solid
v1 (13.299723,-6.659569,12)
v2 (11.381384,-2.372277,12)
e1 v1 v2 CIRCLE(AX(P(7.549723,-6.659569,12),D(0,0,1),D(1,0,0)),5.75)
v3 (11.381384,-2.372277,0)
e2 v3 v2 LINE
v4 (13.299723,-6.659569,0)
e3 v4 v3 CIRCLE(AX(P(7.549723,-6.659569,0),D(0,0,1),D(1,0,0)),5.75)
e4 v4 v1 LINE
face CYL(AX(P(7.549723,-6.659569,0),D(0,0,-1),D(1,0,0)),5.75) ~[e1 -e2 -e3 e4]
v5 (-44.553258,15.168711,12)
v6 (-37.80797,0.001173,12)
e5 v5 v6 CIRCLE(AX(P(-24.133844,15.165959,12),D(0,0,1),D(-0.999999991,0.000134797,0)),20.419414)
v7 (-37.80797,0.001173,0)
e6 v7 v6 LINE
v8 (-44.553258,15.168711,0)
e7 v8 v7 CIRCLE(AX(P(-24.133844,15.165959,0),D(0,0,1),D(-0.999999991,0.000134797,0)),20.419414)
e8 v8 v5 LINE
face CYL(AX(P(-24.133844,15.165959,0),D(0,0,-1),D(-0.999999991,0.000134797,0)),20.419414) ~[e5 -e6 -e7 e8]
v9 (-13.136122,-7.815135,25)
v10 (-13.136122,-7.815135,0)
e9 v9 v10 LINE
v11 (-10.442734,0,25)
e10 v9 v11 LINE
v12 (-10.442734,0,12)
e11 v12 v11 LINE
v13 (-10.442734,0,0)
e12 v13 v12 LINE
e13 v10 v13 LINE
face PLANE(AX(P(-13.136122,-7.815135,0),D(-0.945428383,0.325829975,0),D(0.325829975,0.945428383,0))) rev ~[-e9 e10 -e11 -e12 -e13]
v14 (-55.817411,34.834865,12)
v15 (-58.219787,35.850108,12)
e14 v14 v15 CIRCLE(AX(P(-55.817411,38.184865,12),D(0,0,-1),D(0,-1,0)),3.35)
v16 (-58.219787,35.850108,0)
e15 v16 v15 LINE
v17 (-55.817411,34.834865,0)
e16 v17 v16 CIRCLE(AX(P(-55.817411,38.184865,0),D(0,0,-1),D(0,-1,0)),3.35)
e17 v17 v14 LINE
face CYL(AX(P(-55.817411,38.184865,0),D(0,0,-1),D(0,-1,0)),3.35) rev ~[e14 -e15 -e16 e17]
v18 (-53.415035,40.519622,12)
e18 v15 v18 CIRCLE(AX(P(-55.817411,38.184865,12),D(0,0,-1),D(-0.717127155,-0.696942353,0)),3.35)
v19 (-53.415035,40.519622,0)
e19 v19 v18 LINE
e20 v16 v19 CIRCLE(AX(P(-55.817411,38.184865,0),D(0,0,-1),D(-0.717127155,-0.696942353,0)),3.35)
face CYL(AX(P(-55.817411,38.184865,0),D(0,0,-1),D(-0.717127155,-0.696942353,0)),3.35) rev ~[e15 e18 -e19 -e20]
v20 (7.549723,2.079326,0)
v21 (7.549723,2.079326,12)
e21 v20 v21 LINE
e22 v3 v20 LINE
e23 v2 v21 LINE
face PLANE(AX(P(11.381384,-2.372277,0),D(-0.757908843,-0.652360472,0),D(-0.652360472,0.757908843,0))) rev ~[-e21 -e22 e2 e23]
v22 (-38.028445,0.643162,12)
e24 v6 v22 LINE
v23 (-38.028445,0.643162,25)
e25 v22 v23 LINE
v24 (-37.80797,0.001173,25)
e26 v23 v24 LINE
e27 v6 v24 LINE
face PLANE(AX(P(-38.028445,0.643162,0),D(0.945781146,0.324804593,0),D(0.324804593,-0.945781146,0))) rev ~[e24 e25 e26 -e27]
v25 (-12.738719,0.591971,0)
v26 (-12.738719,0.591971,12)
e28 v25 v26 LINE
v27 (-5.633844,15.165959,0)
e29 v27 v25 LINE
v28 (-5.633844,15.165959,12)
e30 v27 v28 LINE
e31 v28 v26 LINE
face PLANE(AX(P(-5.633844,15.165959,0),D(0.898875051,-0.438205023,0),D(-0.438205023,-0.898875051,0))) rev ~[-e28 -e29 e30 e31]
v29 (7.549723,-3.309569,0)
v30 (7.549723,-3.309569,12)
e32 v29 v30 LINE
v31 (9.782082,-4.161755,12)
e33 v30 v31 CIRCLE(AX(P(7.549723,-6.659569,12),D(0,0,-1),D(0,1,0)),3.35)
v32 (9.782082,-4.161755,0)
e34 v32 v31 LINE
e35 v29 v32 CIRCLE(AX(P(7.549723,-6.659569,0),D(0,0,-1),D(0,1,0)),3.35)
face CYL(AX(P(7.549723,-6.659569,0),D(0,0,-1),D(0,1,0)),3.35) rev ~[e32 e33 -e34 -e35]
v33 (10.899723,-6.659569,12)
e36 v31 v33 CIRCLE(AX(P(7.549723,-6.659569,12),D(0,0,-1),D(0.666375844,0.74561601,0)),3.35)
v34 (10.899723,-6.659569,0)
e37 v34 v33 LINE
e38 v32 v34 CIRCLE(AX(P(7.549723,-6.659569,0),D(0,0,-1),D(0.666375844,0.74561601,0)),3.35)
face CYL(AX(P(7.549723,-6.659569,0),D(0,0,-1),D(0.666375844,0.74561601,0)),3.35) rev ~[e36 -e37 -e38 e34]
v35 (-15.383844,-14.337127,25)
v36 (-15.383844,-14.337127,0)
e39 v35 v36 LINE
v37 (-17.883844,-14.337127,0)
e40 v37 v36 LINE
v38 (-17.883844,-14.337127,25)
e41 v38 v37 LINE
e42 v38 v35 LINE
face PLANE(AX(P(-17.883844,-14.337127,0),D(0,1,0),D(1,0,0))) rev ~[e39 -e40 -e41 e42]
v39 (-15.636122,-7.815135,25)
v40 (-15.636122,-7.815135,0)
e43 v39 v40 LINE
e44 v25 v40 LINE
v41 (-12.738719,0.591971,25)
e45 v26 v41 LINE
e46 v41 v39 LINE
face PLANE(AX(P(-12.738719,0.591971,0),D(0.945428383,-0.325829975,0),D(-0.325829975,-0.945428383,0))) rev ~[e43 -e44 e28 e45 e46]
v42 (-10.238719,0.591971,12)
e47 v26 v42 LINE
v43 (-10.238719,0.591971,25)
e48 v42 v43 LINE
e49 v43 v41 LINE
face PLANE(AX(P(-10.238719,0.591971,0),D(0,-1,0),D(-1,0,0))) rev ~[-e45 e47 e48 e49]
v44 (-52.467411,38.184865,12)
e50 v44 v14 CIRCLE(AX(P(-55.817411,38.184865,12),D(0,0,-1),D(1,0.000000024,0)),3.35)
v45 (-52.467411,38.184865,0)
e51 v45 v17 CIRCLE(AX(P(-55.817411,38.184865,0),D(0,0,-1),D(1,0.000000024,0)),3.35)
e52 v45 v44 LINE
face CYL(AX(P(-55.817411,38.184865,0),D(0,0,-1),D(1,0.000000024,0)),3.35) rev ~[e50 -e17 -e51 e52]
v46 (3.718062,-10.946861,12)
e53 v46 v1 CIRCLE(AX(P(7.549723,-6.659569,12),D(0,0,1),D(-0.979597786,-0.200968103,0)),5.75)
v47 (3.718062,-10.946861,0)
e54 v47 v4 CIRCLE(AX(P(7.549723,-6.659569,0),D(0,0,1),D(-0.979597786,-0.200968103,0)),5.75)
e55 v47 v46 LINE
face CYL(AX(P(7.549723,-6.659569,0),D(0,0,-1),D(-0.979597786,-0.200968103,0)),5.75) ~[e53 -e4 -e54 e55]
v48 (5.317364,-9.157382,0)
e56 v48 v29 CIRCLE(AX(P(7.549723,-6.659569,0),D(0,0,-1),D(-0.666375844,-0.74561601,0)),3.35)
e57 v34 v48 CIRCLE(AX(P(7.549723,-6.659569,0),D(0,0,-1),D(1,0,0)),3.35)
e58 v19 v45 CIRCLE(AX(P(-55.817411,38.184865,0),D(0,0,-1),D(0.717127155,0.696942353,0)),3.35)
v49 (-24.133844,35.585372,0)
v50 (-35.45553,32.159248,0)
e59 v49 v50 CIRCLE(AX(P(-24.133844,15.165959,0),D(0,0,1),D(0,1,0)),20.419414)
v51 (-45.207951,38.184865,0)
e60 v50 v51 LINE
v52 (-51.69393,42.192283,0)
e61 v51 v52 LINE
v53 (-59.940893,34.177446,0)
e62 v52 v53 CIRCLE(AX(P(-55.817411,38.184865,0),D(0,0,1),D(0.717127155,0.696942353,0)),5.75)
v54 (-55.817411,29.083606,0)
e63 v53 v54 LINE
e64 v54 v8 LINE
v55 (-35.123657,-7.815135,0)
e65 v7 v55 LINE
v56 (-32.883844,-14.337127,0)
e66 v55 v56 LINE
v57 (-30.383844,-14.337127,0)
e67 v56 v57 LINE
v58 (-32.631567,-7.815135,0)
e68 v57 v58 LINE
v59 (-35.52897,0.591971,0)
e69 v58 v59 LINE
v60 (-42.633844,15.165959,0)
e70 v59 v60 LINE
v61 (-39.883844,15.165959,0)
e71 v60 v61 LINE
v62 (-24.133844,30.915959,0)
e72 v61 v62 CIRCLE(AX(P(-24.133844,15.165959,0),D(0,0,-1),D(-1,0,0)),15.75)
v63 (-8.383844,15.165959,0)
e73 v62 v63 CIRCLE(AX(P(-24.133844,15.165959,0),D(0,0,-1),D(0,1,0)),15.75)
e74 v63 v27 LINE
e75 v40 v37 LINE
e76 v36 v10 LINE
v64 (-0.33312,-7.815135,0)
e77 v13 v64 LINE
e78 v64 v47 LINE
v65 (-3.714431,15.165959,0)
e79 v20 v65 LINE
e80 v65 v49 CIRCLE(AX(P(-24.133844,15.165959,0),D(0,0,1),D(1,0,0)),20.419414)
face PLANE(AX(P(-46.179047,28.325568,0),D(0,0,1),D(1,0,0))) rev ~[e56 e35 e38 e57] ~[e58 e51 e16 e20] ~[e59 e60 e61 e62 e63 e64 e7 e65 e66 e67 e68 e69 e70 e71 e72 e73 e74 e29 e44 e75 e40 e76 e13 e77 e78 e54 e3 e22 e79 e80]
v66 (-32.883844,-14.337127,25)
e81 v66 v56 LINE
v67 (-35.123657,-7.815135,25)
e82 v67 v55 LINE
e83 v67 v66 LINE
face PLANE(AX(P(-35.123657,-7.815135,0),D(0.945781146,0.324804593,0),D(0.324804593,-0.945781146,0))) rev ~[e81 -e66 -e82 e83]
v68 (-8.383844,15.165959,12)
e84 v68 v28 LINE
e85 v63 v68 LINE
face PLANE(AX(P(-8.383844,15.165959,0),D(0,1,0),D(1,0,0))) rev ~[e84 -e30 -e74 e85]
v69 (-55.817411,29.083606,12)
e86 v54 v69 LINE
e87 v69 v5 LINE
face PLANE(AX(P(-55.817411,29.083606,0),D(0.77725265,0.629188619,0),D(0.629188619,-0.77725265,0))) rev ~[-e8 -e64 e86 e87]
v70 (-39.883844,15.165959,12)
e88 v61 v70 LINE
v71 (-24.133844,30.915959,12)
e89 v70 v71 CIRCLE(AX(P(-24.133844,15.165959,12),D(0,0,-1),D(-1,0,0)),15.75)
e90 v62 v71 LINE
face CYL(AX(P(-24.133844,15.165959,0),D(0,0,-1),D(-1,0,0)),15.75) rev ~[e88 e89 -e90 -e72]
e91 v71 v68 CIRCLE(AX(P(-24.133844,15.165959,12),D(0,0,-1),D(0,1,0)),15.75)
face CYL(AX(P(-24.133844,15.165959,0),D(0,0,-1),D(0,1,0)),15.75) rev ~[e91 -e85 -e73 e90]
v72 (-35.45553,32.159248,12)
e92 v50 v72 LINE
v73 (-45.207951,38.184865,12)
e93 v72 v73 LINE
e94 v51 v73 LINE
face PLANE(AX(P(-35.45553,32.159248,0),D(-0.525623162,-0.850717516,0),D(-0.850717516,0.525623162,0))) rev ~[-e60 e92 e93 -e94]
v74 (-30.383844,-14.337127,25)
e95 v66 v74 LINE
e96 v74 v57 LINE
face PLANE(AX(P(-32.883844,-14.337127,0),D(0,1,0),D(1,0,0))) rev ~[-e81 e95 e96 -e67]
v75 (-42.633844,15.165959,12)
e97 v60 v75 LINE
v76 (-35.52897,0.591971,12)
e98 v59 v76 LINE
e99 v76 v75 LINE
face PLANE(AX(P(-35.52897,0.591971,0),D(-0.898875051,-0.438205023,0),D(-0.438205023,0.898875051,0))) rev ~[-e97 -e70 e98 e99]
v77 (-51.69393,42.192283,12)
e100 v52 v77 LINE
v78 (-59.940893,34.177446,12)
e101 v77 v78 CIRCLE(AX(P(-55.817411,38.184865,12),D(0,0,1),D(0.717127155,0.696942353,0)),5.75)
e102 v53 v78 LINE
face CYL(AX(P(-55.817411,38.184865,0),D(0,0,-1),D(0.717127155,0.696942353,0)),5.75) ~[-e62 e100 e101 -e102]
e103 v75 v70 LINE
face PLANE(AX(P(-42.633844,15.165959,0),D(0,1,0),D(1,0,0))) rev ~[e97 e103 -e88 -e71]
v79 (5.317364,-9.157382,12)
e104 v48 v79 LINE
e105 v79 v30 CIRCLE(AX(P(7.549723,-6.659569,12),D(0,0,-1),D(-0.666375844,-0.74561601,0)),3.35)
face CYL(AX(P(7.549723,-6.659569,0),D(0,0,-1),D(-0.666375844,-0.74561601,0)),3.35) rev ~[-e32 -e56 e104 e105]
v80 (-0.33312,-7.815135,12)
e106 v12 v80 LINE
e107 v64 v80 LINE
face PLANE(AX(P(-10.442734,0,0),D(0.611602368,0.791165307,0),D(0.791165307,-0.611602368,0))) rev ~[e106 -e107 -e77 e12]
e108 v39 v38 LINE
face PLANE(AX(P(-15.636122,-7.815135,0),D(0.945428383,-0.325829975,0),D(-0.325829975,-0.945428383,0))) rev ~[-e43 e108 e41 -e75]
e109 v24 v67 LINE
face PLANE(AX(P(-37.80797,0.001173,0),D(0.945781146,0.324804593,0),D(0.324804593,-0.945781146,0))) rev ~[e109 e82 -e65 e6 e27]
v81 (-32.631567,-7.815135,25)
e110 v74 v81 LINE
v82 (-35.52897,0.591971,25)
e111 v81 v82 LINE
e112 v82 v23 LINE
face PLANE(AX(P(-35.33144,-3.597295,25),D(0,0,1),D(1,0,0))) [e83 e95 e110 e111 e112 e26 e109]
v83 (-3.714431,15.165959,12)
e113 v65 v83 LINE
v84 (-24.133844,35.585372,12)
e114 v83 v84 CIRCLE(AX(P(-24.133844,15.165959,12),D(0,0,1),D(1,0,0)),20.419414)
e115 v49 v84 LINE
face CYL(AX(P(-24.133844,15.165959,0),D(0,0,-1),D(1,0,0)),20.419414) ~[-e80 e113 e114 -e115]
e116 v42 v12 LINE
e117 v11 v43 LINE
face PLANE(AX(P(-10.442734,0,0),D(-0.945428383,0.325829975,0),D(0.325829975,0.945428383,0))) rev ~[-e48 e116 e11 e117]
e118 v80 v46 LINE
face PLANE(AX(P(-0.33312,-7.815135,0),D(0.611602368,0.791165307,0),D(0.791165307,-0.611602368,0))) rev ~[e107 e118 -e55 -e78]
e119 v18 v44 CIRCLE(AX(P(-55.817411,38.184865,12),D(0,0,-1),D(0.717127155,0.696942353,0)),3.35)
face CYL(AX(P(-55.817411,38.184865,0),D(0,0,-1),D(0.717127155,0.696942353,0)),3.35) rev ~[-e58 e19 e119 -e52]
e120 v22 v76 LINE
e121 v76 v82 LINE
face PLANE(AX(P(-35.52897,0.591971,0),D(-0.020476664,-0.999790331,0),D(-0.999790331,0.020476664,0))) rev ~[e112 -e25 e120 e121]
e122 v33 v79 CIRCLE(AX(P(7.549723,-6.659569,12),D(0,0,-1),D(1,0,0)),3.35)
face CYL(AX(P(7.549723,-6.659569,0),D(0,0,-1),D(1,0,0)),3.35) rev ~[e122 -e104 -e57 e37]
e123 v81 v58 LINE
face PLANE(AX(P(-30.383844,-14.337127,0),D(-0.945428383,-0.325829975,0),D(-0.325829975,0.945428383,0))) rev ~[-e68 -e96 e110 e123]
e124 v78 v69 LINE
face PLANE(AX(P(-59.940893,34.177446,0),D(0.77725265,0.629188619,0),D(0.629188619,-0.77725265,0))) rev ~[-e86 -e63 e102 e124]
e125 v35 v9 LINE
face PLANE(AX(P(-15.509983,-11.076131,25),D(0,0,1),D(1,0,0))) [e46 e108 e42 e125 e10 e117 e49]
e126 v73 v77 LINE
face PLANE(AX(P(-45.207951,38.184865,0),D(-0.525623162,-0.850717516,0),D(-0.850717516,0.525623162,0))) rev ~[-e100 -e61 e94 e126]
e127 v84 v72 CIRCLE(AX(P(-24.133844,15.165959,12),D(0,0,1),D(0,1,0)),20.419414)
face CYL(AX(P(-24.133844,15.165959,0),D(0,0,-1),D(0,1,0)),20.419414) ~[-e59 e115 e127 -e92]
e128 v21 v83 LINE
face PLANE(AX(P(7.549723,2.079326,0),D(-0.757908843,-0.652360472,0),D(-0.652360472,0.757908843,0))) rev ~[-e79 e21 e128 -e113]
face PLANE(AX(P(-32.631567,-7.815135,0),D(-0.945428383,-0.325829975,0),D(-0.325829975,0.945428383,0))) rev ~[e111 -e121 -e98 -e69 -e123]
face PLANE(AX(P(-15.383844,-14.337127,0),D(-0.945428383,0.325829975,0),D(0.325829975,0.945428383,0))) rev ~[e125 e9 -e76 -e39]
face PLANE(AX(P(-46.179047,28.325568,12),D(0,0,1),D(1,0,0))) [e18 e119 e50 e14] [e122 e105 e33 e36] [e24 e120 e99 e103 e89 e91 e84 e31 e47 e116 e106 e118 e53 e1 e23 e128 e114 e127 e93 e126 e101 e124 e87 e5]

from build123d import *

# Parameters (mm, degrees)
F1_DEPTH = 12
F2_DEPTH = 25


# Not quite as in the source:
# - ends of sketch curves that miss each other by under 0.0002 mm in the source are joined


with BuildPart() as f1:
    # F0 (on Top) → F1 (new body)
    with BuildSketch(Plane.XY):
        with BuildLine():
            Line((-45.2079510631, 38.1848650801), (-50.0674114416, 38.1848649627))
            ThreePointArc((-50.0674114416, 38.1848649627), (-51.7515474497, 34.119000832), (-55.8174114415, 32.4348648238))
            Line((-55.8174114415, 32.4348648238), (-55.8174114414, 29.083605512))
            Line((-55.8174114414, 29.083605512), (-44.5532578407, 15.1687110318))
            ThreePointArc((-44.5532578407, 15.1687110318), (-42.1350647352, 24.8048651036), (-35.4555304308, 32.1592477879))
            Line((-35.4555304308, 32.1592477879), (-45.2079510631, 38.1848650801))
        make_face()
        with BuildLine():
            Line((-50.0674114416, 38.1848649627), (-52.4674114416, 38.1848649047))
            ThreePointArc((-52.4674114416, 38.1848649047), (-53.4486037246, 35.8160571069), (-55.8174114415, 34.8348648238))
            Line((-55.8174114415, 34.8348648238), (-55.8174114415, 32.4348648238))
            ThreePointArc((-55.8174114415, 32.4348648238), (-51.7515474497, 34.119000832), (-50.0674114416, 38.1848649627))
        make_face()
        with BuildLine():
            Line((-55.8174114414, 29.083605512), (-55.8174114415, 32.4348648238))
            ThreePointArc((-55.8174114415, 32.4348648238), (-58.0556968865, 32.8883963526), (-59.9408925855, 34.1774462962))
            Line((-59.9408925855, 34.1774462962), (-55.8174114414, 29.083605512))
        make_face()
        with BuildLine():
            Line((-55.8174114415, 32.4348648238), (-55.8174114415, 34.8348648238))
            ThreePointArc((-55.8174114415, 34.8348648238), (-57.1214560051, 35.0990962362), (-58.2197874124, 35.8501079425))
            Line((-58.2197874124, 35.8501079425), (-59.9408925855, 34.1774462962))
            ThreePointArc((-59.9408925855, 34.1774462962), (-58.0556968865, 32.8883963526), (-55.8174114415, 32.4348648238))
        make_face()
        with BuildLine():
            ThreePointArc((-58.2197874124, 35.8501079425), (-58.1521683229, 40.5872407946), (-53.4150354708, 40.5196217052))
            Line((-53.4150354708, 40.5196217052), (-51.6939302977, 42.1922833515))
            ThreePointArc((-51.6939302977, 42.1922833515), (-59.8248299692, 42.3083459677), (-59.9408925855, 34.1774462962))
            Line((-59.9408925855, 34.1774462962), (-58.2197874124, 35.8501079425))
        make_face()
        with BuildLine():
            ThreePointArc((-53.4150354708, 40.5196217052), (-52.7133447942, 39.4447339634), (-52.4674114416, 38.1848648238))
            Line((-52.4674114416, 38.1848648238), (-50.0674114416, 38.1848649627))
            ThreePointArc((-50.0674114416, 38.1848649627), (-50.4895358529, 40.3473267799), (-51.6939302977, 42.1922833515))
            Line((-51.6939302977, 42.1922833515), (-53.4150354708, 40.5196217052))
        make_face()
        with BuildLine():
            ThreePointArc((-51.6939302977, 42.1922833515), (-50.4895358529, 40.3473267799), (-50.0674114416, 38.1848648238))
            Line((-50.0674114416, 38.1848648238), (-45.2079510631, 38.1848650801))
            Line((-45.2079510631, 38.1848650801), (-51.6939302977, 42.1922833515))
        make_face()
        with BuildLine():
            ThreePointArc((-24.1338443596, 35.5853722206), (-30.0482104313, 34.7100811604), (-35.4555304308, 32.1592477879))
            ThreePointArc((-35.4555304308, 32.1592477879), (-42.1350647352, 24.8048651036), (-44.5532578407, 15.1687110318))
            Line((-44.5532578407, 15.1687110318), (-42.6338443592, 15.1659585535))
            Line((-42.6338443592, 15.1659585535), (-39.8838443592, 15.1659585535))
            ThreePointArc((-39.8838443592, 15.1659585535), (-35.270776163, 26.3028903571), (-24.1338443595, 30.9159585535))
            Line((-24.1338443595, 30.9159585535), (-24.1338443596, 35.5853722206))
        make_face()
        with BuildLine():
            ThreePointArc((-3.7144306922, 15.1659585535), (-9.6951384875, 29.6046644255), (-24.1338443596, 35.5853722206))
            Line((-24.1338443596, 35.5853722206), (-24.1338443595, 30.9159585535))
            ThreePointArc((-24.1338443595, 30.9159585535), (-12.9969125556, 26.3028903573), (-8.3838443592, 15.1659585535))
            Line((-8.3838443592, 15.1659585535), (-5.6338443592, 15.1659585535))
            Line((-5.6338443592, 15.1659585535), (-3.7144306922, 15.1659585535))
        make_face()
        with BuildLine():
            Line((-42.6338443592, 15.1659585535), (-44.5532578407, 15.1687110318))
            ThreePointArc((-44.5532578407, 15.1687110318), (-42.7914410163, 6.8685769492), (-37.807970261, 0.0011725238))
            Line((-37.807970261, 0.0011725238), (-38.0284454354, 0.643162408))
            Line((-38.0284454354, 0.643162408), (-35.5289696075, 0.5919707473))
            Line((-35.5289696075, 0.5919707473), (-42.6338443592, 15.1659585535))
        make_face()
        Polygon((-38.0284454354, 0.643162408), (-37.807970261, 0.0011725238), (-35.1236572441, -7.8151351762), (-32.6315665225, -7.8151351762), (-35.5289696075, 0.5919707473), align=None)
        Polygon((-32.6315665225, -7.8151351762), (-35.1236572441, -7.8151351762), (-32.8838443592, -14.3371266833), (-30.3838443592, -14.3371266833), align=None)
        Polygon((-13.136122196, -7.8151351762), (-15.636122196, -7.8151351762), (-17.8838443592, -14.3371266833), (-15.3838443592, -14.3371266833), align=None)
        Polygon((-10.2387191109, 0.5919707473), (-12.7387191109, 0.5919707473), (-15.636122196, -7.8151351762), (-13.136122196, -7.8151351762), (-10.4427343672, 0), align=None)
        with BuildLine():
            Line((7.5497227229, 2.079326472), (-3.7144306922, 15.1659585535))
            Line((-3.7144306922, 15.1659585535), (-5.6338443592, 15.1659585535))
            Line((-5.6338443592, 15.1659585535), (-12.7387191109, 0.5919707473))
            Line((-12.7387191109, 0.5919707473), (-10.2387191109, 0.5919707473))
            Line((-10.2387191109, 0.5919707473), (-10.4427343672, 0))
            Line((-10.4427343672, 0), (-0.3331204375, -7.8151351762))
            Line((-0.3331204375, -7.8151351762), (1.9170354556, -7.8151351762))
            ThreePointArc((1.9170354556, -7.8151351762), (3.0939956275, -3.0251503303), (7.549722723, -0.909568585))
            Line((7.549722723, -0.909568585), (7.5497227229, 2.079326472))
        make_face()
        with BuildLine():
            ThreePointArc((13.2997227231, -6.659568585), (12.7982725871, -4.3111171112), (11.3813838275, -2.3722765282))
            Line((11.3813838275, -2.3722765282), (9.7820818013, -4.1617549519))
            ThreePointArc((9.7820818013, -4.1617549519), (10.6075735134, -5.2913403351), (10.8997227231, -6.659568585))
            ThreePointArc((10.8997227231, -6.659568585), (8.917950973, -9.7174193754), (5.3173636448, -9.1573822181))
            Line((5.3173636448, -9.1573822181), (3.7180616186, -10.9468606418))
            ThreePointArc((3.7180616186, -10.9468606418), (9.8981741968, -11.908118449), (13.2997227231, -6.659568585))
        make_face()
        with BuildLine():
            ThreePointArc((11.3813838275, -2.3722765282), (9.6004019609, -1.2876774223), (7.549722723, -0.909568585))
            Line((7.549722723, -0.909568585), (7.549722723, -3.309568585))
            ThreePointArc((7.549722723, -3.309568585), (8.744466279, -3.5298580815), (9.7820818013, -4.1617549519))
            Line((9.7820818013, -4.1617549519), (11.3813838275, -2.3722765282))
        make_face()
        with BuildLine():
            Line((7.549722723, -3.309568585), (7.549722723, -0.909568585))
            ThreePointArc((7.549722723, -0.909568585), (3.0939956275, -3.0251503303), (1.9170354556, -7.8151351762))
            ThreePointArc((1.9170354556, -7.8151351762), (2.5652068364, -9.5261172721), (3.7180616186, -10.9468606418))
            Line((3.7180616186, -10.9468606418), (5.3173636448, -9.1573822181))
            ThreePointArc((5.3173636448, -9.1573822181), (4.4200122196, -5.464825029), (7.549722723, -3.309568585))
        make_face()
        with BuildLine():
            ThreePointArc((3.7180616186, -10.9468606418), (2.5652068364, -9.5261172721), (1.9170354556, -7.8151351762))
            Line((1.9170354556, -7.8151351762), (-0.3331204375, -7.8151351762))
            Line((-0.3331204375, -7.8151351762), (3.7180616186, -10.9468606418))
        make_face()
        with BuildLine():
            Line((11.3813838275, -2.3722765282), (7.5497227229, 2.079326472))
            Line((7.5497227229, 2.079326472), (7.549722723, -0.909568585))
            ThreePointArc((7.549722723, -0.909568585), (9.6004019609, -1.2876774223), (11.3813838275, -2.3722765282))
        make_face()
    extrude(amount=F1_DEPTH)

    # F0 (on Top) → F2 (join)
    with BuildSketch(Plane.XY):
        Polygon((-38.0284454354, 0.643162408), (-37.807970261, 0.0011725238), (-35.1236572441, -7.8151351762), (-32.6315665225, -7.8151351762), (-35.5289696075, 0.5919707473), align=None)
        Polygon((-32.6315665225, -7.8151351762), (-35.1236572441, -7.8151351762), (-32.8838443592, -14.3371266833), (-30.3838443592, -14.3371266833), align=None)
        Polygon((-13.136122196, -7.8151351762), (-15.636122196, -7.8151351762), (-17.8838443592, -14.3371266833), (-15.3838443592, -14.3371266833), align=None)
        Polygon((-10.2387191109, 0.5919707473), (-12.7387191109, 0.5919707473), (-15.636122196, -7.8151351762), (-13.136122196, -7.8151351762), (-10.4427343672, 0), align=None)
    extrude(amount=F2_DEPTH)


solid = f1.part
